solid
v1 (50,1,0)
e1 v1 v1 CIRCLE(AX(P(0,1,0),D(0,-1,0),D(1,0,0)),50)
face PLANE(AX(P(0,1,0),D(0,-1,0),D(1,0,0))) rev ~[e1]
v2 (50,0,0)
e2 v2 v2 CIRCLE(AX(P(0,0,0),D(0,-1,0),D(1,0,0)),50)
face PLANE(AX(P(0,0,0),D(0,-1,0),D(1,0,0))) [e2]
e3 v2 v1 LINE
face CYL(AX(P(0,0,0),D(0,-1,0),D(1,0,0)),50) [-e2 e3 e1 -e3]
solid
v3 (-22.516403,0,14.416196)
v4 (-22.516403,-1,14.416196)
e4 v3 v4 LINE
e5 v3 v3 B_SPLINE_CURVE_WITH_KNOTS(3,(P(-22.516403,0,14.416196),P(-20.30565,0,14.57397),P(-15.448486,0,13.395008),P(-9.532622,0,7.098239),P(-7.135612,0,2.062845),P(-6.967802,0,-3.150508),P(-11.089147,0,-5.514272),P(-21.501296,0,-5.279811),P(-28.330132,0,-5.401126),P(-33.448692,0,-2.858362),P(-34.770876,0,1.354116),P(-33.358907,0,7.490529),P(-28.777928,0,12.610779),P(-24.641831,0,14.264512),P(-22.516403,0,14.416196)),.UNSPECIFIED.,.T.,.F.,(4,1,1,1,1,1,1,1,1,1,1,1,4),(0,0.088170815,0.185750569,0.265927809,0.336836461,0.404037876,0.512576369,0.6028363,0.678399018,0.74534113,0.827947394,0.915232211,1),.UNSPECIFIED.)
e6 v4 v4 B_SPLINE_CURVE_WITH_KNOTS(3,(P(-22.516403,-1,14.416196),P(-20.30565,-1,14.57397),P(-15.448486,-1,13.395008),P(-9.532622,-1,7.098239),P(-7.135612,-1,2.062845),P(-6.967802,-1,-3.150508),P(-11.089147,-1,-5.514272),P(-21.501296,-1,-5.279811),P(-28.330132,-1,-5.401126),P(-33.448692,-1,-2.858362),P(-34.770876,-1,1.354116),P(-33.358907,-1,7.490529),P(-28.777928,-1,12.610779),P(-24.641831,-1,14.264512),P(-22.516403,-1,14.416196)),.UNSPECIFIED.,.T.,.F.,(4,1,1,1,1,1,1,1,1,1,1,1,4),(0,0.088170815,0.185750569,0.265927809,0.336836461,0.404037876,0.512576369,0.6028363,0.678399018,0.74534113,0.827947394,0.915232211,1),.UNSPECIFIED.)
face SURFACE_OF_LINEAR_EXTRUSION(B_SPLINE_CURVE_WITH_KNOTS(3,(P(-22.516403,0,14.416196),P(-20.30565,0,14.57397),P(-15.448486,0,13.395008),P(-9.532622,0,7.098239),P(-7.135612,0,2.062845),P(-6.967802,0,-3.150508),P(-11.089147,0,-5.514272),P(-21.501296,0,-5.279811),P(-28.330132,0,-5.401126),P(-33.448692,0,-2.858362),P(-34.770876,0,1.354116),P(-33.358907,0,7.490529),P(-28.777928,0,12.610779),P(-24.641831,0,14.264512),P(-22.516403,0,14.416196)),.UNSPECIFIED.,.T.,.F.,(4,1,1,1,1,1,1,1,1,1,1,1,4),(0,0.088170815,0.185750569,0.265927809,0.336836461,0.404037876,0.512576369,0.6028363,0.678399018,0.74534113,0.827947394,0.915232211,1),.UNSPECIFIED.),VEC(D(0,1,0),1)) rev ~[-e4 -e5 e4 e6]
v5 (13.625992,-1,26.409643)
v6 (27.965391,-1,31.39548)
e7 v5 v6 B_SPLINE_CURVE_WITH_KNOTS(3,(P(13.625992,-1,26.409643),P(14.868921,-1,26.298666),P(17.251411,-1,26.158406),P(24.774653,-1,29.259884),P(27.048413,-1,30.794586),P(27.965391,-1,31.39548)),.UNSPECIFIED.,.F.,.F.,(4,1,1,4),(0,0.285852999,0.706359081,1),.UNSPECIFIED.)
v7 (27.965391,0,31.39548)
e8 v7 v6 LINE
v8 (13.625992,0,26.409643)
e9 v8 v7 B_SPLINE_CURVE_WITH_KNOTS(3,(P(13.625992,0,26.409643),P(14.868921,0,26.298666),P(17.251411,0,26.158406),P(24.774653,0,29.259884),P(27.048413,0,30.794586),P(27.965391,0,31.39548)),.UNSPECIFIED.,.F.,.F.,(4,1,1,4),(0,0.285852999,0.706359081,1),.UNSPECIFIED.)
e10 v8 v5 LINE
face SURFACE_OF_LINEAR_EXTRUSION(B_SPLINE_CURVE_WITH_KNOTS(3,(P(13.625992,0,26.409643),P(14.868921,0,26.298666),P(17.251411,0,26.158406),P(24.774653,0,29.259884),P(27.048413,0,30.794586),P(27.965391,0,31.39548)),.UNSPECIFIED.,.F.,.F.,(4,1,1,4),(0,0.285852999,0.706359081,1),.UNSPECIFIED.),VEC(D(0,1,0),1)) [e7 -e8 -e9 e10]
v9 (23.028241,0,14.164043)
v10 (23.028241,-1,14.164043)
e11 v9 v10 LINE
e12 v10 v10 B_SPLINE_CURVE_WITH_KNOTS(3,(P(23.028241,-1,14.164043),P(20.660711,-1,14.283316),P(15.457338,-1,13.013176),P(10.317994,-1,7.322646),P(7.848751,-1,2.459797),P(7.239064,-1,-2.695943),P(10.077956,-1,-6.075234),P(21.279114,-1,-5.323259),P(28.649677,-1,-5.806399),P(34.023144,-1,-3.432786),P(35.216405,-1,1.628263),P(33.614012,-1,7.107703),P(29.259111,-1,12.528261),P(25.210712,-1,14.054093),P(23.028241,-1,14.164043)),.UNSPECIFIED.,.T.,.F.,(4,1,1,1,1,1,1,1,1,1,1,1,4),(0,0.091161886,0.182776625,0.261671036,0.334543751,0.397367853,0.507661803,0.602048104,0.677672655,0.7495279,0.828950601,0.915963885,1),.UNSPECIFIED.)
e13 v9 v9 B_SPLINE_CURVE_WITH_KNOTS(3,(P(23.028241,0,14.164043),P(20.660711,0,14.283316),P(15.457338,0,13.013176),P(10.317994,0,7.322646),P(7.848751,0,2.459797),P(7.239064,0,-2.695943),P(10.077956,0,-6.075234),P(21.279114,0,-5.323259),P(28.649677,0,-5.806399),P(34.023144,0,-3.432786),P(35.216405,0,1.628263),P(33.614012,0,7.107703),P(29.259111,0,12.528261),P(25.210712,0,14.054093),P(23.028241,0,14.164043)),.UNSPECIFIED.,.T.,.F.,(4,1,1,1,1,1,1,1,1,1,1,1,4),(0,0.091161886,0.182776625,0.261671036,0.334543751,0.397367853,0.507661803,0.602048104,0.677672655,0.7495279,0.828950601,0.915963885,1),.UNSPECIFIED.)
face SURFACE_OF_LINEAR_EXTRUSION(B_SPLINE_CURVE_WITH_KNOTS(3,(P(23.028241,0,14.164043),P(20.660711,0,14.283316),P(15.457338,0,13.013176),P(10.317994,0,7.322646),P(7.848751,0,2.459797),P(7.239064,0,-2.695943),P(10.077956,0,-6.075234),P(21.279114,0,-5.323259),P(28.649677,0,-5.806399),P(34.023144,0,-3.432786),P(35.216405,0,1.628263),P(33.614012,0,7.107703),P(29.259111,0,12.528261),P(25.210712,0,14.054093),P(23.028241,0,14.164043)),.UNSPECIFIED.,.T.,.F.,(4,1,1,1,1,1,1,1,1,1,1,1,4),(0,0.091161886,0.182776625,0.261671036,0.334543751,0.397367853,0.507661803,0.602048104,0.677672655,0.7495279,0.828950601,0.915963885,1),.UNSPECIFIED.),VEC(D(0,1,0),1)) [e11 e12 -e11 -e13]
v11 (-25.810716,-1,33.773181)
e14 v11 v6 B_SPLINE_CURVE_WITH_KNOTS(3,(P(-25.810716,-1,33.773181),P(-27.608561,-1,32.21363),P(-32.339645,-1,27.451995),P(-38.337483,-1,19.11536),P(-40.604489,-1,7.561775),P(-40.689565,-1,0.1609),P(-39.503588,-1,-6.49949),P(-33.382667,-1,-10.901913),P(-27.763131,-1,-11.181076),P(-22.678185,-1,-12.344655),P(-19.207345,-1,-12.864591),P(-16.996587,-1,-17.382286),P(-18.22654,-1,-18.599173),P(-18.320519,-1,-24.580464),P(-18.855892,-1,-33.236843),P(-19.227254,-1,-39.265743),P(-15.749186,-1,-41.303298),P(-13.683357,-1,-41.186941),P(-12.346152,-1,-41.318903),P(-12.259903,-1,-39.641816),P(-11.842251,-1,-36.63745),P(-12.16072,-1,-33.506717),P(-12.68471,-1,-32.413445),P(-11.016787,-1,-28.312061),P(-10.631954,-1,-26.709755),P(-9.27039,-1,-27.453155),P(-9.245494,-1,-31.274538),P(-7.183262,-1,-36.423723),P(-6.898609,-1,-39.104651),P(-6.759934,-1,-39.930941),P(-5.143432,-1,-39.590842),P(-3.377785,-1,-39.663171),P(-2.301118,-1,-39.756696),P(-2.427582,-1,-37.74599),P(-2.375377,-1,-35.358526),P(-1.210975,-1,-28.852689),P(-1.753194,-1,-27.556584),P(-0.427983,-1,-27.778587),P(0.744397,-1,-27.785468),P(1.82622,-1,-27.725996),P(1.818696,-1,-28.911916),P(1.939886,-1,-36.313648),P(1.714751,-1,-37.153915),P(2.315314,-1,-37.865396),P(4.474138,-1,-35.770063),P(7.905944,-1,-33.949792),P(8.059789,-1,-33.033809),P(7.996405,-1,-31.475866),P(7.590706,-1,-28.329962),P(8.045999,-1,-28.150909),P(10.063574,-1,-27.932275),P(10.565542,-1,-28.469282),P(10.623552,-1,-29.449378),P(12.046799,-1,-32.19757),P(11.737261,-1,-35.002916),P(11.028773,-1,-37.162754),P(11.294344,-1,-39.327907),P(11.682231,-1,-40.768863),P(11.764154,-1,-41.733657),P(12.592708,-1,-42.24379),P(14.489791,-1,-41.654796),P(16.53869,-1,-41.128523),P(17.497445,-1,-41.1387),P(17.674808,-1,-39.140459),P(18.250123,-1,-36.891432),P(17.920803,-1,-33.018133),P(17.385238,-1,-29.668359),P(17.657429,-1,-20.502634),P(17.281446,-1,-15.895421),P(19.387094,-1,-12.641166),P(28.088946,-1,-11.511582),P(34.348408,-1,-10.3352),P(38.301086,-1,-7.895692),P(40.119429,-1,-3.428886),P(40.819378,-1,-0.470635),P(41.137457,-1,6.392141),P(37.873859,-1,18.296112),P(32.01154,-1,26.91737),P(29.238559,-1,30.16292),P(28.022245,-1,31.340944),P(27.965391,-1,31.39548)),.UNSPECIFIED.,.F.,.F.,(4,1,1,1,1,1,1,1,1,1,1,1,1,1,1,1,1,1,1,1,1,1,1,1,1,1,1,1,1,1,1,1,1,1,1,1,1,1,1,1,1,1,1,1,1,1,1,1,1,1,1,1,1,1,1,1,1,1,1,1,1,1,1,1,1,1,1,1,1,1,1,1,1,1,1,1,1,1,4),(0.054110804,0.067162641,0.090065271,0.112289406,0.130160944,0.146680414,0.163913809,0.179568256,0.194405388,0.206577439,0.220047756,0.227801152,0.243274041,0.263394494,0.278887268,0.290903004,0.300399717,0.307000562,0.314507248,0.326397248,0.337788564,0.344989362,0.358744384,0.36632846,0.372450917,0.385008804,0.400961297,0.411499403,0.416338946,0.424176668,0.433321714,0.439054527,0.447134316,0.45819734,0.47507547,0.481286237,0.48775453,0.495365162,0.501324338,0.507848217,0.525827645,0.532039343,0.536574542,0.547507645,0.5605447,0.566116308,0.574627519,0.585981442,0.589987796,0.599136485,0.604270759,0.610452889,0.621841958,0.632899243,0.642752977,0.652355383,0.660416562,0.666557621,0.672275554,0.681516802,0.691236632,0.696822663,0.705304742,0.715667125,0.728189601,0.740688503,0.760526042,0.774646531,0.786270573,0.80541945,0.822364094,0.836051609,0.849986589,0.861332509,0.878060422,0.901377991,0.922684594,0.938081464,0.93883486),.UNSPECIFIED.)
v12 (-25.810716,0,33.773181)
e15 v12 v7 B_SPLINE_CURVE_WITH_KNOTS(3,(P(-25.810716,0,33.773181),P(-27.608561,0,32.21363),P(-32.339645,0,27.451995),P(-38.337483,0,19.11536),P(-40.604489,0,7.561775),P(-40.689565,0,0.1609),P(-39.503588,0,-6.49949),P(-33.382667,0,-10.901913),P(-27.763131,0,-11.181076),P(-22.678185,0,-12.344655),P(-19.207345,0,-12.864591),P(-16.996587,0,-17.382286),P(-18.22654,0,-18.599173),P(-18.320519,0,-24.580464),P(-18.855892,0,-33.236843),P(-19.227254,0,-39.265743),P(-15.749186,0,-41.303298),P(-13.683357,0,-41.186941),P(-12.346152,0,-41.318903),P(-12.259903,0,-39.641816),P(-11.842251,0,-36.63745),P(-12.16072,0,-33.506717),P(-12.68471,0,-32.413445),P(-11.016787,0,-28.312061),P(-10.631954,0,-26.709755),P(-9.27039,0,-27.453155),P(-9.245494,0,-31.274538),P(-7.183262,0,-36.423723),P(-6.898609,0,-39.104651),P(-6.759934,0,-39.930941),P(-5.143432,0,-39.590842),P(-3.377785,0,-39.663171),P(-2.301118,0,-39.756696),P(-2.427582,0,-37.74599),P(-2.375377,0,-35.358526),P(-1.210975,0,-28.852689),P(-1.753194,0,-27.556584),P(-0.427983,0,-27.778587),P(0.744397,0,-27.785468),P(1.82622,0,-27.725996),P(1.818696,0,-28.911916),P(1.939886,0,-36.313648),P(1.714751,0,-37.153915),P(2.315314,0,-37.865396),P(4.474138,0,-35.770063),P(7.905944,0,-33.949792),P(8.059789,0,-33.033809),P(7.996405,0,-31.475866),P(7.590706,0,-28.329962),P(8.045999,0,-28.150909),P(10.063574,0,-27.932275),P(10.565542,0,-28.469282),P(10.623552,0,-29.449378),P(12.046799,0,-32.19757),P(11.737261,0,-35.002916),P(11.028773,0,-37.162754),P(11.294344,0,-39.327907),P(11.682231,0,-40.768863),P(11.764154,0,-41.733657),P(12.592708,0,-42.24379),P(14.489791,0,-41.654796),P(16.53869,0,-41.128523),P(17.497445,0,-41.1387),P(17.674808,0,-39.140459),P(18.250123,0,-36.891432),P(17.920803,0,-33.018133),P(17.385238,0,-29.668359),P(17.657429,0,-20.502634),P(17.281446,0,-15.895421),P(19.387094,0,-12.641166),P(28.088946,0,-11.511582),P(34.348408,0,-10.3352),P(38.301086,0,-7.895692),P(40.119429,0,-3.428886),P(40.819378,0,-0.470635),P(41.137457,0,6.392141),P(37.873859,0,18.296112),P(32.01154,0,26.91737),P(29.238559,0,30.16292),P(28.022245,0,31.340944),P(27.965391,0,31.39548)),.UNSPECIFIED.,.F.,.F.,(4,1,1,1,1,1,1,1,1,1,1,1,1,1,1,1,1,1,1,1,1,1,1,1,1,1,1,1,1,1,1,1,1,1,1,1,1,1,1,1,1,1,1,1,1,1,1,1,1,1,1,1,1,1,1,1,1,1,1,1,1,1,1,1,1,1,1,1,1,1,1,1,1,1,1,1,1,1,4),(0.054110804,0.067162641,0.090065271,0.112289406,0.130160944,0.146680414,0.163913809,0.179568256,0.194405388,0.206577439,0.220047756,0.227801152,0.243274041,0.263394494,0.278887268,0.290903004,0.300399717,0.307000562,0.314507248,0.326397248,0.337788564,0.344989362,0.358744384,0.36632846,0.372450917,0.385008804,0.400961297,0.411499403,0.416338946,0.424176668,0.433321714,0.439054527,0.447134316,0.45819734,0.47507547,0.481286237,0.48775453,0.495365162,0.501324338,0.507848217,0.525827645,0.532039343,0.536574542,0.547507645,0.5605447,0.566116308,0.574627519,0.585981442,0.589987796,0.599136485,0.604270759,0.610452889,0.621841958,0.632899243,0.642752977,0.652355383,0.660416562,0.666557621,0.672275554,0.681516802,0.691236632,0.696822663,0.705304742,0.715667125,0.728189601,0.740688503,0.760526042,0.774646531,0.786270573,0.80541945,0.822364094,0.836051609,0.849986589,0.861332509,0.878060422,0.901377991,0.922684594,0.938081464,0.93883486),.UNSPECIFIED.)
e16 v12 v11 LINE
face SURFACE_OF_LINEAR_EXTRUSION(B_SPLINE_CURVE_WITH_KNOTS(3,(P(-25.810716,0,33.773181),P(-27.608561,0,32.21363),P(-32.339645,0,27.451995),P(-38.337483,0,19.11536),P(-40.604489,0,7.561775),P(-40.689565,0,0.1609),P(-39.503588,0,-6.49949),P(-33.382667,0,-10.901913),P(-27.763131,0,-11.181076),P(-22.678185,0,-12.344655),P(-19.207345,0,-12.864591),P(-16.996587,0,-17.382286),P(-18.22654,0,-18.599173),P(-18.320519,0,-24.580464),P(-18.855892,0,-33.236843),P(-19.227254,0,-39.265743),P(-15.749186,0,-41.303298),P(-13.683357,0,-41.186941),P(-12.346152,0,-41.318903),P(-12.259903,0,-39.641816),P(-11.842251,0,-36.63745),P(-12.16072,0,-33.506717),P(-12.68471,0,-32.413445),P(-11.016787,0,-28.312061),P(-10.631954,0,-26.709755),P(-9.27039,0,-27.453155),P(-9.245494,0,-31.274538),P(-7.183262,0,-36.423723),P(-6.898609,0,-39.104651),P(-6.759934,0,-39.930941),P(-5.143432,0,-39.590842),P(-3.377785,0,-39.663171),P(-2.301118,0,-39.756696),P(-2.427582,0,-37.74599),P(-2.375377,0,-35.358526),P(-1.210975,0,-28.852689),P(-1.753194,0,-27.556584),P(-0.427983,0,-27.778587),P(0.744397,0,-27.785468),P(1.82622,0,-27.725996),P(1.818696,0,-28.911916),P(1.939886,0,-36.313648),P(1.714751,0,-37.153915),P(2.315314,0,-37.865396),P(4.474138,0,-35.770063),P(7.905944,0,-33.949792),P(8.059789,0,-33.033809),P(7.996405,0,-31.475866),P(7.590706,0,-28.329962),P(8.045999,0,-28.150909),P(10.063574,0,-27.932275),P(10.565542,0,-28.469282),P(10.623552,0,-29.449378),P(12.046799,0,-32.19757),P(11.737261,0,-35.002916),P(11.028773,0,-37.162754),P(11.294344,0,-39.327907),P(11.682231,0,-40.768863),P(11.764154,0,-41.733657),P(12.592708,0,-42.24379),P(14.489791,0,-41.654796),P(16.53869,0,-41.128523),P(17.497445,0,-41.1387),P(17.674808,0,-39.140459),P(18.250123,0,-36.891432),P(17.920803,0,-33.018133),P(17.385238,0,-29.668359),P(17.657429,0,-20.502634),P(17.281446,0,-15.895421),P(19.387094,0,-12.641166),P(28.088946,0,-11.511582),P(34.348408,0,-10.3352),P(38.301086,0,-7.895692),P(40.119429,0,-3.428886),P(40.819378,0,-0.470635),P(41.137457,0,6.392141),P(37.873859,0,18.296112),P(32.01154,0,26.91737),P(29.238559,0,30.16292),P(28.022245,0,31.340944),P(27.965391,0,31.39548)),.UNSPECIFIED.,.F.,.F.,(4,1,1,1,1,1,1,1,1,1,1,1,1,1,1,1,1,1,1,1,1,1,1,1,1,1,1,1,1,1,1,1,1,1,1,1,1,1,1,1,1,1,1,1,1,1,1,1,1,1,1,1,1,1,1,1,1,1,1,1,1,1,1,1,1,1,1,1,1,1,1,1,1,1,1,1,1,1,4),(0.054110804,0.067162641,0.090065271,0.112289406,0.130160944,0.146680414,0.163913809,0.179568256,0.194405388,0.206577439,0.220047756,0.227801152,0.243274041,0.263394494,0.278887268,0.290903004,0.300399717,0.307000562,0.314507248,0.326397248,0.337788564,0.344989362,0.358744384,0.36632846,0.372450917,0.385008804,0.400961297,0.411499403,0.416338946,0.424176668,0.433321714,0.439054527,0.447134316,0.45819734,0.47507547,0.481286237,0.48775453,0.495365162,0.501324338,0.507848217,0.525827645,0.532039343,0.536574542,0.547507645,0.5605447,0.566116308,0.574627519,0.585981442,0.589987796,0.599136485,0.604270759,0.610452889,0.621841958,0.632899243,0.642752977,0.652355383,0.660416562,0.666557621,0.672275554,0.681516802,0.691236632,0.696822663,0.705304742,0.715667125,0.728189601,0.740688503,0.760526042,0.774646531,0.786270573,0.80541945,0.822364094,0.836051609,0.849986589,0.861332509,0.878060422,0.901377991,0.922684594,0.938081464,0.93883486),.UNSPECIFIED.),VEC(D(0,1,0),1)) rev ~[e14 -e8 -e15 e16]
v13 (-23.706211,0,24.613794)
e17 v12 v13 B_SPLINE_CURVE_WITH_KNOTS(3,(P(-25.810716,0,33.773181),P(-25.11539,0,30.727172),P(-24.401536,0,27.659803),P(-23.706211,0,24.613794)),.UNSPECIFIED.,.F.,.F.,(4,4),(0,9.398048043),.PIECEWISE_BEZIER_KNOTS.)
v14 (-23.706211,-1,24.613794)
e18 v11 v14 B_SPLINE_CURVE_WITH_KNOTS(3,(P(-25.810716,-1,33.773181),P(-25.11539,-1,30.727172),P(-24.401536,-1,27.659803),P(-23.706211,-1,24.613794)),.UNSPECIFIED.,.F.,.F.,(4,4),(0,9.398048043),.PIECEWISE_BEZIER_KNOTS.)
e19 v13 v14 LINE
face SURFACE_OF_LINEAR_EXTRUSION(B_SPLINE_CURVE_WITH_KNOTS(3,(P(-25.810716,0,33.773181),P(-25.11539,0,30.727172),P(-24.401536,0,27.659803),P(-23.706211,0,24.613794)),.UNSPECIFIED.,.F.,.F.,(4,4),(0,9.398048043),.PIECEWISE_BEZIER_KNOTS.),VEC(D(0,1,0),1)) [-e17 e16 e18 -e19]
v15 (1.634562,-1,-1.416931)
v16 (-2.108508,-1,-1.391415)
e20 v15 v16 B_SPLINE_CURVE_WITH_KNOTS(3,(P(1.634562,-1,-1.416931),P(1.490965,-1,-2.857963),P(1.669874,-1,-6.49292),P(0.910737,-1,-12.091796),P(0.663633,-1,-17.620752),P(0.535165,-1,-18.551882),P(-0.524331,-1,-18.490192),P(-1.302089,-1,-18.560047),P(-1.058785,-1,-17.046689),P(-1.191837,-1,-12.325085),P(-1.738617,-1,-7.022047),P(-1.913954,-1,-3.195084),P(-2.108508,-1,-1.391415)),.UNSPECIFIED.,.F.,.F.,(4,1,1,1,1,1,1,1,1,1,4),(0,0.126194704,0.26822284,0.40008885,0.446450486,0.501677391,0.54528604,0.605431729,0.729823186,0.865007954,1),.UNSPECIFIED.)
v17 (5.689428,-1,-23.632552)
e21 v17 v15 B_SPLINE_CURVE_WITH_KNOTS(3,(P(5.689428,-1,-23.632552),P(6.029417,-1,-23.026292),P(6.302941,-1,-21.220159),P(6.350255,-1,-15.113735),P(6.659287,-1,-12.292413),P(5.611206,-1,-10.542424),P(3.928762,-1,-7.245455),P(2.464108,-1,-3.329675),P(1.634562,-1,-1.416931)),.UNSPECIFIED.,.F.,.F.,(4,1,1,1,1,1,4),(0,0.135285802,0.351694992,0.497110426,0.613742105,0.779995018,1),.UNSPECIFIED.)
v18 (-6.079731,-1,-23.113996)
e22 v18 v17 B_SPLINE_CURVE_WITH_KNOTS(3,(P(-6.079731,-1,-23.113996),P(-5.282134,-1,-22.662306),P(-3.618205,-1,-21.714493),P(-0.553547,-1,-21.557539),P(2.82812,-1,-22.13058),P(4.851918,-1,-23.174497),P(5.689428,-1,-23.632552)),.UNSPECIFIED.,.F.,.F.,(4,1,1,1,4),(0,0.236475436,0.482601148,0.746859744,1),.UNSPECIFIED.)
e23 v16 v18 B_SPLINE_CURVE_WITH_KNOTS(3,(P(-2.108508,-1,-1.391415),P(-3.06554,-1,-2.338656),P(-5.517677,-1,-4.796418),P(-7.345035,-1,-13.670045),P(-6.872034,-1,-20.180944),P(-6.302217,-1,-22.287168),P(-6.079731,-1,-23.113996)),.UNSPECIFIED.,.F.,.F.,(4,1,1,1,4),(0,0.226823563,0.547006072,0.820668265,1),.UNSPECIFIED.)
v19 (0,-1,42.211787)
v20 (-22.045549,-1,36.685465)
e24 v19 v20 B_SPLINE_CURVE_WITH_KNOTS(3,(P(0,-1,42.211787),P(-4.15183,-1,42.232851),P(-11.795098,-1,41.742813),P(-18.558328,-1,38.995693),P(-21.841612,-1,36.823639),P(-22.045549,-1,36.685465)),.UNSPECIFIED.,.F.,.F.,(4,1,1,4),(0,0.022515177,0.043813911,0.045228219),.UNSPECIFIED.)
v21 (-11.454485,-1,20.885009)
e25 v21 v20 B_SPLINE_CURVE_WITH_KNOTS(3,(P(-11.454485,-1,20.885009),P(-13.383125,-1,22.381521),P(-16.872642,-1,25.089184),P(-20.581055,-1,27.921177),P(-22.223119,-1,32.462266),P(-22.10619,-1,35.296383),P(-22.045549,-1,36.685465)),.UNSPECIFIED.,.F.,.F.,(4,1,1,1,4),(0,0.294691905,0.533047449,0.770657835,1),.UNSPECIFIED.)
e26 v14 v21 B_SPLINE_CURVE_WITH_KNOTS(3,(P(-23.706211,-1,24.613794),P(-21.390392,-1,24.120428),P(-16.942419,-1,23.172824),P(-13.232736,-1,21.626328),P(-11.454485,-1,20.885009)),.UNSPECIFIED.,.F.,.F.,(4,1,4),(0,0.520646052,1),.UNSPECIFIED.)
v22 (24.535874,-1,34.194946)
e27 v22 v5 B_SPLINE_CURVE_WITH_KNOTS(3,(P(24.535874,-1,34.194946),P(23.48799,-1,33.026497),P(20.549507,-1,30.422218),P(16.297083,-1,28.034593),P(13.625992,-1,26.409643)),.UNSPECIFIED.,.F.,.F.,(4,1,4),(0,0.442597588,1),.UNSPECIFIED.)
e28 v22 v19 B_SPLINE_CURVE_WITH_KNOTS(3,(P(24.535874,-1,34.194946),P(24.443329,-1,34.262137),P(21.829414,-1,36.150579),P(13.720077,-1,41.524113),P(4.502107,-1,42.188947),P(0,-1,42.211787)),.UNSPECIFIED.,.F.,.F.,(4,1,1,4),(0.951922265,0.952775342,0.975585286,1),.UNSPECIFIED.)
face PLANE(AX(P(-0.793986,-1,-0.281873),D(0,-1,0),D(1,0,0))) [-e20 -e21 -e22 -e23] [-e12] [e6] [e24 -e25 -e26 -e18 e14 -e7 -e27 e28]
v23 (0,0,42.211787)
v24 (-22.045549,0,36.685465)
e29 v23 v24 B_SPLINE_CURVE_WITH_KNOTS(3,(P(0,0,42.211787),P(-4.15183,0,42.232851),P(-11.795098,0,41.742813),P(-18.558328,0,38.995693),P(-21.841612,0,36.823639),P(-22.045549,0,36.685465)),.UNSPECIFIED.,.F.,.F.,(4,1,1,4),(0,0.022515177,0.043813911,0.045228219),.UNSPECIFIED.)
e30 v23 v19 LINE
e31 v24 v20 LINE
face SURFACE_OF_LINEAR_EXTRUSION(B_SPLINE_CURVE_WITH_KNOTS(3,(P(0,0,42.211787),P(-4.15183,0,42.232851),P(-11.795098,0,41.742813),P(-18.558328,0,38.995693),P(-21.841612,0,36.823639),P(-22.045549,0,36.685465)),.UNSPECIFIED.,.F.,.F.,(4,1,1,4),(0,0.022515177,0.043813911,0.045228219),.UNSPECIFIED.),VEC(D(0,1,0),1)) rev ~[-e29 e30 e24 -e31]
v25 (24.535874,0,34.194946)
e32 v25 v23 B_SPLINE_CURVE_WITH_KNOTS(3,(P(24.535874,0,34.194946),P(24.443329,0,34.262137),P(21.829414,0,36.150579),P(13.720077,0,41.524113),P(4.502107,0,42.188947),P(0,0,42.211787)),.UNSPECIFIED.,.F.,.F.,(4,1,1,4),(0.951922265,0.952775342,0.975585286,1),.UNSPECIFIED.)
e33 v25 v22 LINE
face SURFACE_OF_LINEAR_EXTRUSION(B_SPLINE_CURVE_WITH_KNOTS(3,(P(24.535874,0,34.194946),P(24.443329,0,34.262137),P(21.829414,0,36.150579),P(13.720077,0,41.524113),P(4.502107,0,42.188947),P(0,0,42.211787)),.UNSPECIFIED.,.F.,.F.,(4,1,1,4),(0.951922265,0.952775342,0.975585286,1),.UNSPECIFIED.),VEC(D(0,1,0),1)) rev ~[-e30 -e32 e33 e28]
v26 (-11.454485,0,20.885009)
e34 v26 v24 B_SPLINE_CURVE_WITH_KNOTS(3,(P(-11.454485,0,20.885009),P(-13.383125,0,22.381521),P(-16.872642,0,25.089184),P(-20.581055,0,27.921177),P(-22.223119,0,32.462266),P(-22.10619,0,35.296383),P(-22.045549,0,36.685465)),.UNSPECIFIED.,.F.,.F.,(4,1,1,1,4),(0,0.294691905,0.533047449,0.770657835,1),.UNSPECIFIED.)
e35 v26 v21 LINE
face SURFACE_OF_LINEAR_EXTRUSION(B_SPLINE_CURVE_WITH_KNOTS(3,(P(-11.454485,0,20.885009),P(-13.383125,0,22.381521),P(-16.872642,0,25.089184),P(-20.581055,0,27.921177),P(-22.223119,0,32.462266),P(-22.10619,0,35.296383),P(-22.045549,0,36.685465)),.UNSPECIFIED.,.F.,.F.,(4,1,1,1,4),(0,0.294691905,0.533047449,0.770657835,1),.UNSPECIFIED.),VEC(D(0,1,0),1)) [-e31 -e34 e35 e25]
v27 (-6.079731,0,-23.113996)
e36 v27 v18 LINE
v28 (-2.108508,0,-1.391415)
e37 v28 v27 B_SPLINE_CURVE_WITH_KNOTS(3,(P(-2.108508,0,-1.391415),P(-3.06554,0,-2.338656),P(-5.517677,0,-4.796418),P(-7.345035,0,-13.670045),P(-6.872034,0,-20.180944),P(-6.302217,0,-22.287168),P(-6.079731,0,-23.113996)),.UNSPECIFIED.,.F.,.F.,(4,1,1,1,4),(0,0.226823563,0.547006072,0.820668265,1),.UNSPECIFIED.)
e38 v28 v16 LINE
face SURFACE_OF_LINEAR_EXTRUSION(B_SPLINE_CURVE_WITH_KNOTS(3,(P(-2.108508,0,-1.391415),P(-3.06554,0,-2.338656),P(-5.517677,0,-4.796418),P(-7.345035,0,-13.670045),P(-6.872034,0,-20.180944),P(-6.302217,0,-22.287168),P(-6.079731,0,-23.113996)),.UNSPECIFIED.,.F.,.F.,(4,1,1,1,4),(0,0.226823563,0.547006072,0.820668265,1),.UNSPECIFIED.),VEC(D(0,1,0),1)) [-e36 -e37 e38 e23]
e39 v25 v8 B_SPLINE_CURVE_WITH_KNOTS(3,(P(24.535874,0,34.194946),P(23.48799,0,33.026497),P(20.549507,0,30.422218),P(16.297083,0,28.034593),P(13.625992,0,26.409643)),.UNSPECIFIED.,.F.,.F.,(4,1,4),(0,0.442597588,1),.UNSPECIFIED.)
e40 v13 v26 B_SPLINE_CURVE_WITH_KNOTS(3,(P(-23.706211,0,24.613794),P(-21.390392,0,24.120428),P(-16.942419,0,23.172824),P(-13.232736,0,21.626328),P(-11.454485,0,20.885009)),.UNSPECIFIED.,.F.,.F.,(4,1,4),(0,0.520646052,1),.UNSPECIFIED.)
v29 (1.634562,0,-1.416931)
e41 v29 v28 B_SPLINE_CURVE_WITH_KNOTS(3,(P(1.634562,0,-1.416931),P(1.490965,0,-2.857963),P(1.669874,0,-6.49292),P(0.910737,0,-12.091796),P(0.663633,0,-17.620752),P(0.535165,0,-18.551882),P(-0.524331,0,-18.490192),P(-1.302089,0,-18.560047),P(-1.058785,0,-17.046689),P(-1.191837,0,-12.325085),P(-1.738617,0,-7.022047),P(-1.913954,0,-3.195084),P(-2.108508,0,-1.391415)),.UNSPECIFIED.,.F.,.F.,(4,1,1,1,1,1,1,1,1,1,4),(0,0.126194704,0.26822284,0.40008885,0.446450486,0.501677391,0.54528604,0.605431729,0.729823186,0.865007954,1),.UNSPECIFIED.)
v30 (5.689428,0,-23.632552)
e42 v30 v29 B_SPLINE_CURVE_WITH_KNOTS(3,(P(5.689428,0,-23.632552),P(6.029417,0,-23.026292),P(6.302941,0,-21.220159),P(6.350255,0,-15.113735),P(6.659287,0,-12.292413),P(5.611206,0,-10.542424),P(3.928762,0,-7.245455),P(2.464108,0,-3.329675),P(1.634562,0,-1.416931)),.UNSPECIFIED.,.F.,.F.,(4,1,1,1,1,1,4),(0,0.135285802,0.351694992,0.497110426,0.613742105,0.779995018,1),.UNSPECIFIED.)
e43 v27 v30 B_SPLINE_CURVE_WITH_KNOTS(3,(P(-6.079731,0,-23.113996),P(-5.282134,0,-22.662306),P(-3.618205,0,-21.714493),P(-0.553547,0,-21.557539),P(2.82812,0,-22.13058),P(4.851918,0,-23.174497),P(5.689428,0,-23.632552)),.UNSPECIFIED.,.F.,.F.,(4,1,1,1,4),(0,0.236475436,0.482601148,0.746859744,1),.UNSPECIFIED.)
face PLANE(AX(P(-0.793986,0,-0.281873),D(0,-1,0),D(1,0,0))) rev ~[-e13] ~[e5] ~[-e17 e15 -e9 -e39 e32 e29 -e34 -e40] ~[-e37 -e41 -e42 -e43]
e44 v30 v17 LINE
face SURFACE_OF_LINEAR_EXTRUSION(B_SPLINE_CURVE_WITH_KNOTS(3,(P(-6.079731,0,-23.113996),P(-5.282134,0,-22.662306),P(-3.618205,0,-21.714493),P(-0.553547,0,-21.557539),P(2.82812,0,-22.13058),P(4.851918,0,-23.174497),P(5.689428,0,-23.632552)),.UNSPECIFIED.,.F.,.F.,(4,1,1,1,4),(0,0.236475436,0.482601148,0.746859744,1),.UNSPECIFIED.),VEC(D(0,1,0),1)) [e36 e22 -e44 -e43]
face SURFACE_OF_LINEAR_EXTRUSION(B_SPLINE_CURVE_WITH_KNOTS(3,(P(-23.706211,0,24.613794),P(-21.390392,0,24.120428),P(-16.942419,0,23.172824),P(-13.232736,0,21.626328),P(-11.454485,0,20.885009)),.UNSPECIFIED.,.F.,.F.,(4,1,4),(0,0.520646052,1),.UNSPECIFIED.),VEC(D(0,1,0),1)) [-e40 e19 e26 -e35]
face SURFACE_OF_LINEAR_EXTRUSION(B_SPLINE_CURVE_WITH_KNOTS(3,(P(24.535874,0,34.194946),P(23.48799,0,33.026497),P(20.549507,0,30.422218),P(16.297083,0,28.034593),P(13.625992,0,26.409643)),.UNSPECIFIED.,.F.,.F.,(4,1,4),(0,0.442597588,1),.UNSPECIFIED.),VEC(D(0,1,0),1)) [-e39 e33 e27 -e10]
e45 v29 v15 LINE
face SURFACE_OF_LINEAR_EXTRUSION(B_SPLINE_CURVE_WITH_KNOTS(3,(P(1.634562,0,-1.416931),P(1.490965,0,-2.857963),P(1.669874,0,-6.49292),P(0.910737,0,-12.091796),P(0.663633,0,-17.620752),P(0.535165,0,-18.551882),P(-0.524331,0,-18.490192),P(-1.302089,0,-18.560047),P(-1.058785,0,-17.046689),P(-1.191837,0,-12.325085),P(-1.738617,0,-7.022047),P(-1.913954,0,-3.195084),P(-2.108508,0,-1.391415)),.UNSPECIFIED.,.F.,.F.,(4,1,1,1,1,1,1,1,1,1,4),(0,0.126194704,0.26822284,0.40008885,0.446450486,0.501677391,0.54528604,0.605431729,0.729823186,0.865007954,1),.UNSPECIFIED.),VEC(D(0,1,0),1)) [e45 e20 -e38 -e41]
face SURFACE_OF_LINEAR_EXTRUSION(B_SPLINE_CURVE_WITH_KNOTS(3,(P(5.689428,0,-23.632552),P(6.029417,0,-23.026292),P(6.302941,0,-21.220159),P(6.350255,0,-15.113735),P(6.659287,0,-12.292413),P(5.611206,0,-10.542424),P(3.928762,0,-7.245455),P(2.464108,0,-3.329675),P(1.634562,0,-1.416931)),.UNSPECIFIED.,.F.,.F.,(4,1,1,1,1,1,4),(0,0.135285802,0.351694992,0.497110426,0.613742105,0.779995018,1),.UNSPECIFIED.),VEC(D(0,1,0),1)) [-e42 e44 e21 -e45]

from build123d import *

# Parameters (mm, degrees)
F1_R     = 50
F2_DEPTH = 1
F3_DEPTH = 1


with BuildPart() as f2:
    # F1 (on Front) → F2 (new body)
    with BuildSketch(Plane.XZ):
        Circle(F1_R)
        with BuildLine():
            add(Edge.make_bspline(
                [(0, 42.2117872393), (-4.1518296289, 42.2328506159), (-11.7950982354, 41.7428127116), (-18.5583280025, 38.9956928302), (-21.8416117864, 36.8236386827), (-22.0455490568, 36.6854647788)],
                knots=[0, 0, 0, 0, 0.0225151774, 0.0438139107, 0.045228219, 0.045228219, 0.045228219, 0.045228219], degree=3))
            add(Edge.make_bspline(
                [(24.5358739047, 34.1949462892), (24.4433290355, 34.2621365821), (21.8294135785, 36.1505788176), (13.7200767318, 41.5241134747), (4.5021068795, 42.1889468096), (0, 42.2117872393)],
                knots=[0.9519222652, 0.9519222652, 0.9519222652, 0.9519222652, 0.9527753421, 0.9755852855, 1, 1, 1, 1], degree=3))
            add(Edge.make_bspline(
                [(27.9653905239, 31.395479857), (26.9777623389, 32.3428383748), (25.9556430174, 33.1641522159), (24.5358739047, 34.1949462892)],
                knots=[0.9388348597, 0.9388348597, 0.9388348597, 0.9388348597, 0.9519222652, 0.9519222652, 0.9519222652, 0.9519222652], degree=3))
            add(Edge.make_bspline(
                [(-25.8107159623, 33.7731806512), (-27.6085613015, 32.2136299029), (-32.3396448263, 27.4519948446), (-38.3374828793, 19.1153604845), (-40.6044889327, 7.5617746628), (-40.6895649134, 0.160899739), (-39.5035880323, -6.4994897033), (-33.3826669028, -10.9019134709), (-27.7631312299, -11.1810756086), (-22.678184549, -12.3446551948), (-19.2073445078, -12.8645914377), (-16.996587281, -17.3822862253), (-18.2265403297, -18.5991733267), (-18.3205187094, -24.5804643067), (-18.8558923982, -33.23684272), (-19.227253605, -39.2657426144), (-15.7491862761, -41.3032984762), (-13.6833573427, -41.1869410633), (-12.3461522337, -41.3189025592), (-12.259903056, -39.641815711), (-11.8422509257, -36.6374496799), (-12.1607198609, -33.5067173398), (-12.6847097019, -32.4134451461), (-11.0167872005, -28.3120606994), (-10.6319540152, -26.7097549158), (-9.2703902883, -27.4531554981), (-9.2454941531, -31.2745381629), (-7.1832623162, -36.42372276), (-6.8986091815, -39.104650667), (-6.7599340161, -39.930941303), (-5.1434315839, -39.5908424392), (-3.3777848263, -39.6631714956), (-2.3011178725, -39.7566957771), (-2.4275819303, -37.7459902706), (-2.3753767127, -35.3585257917), (-1.2109750063, -28.8526891406), (-1.7531941117, -27.5565836186), (-0.4279829764, -27.7785865503), (0.7443967174, -27.7854675929), (1.8262199292, -27.7259962358), (1.8186960843, -28.9119160062), (1.939885801, -36.3136478787), (1.7147514894, -37.153915214), (2.3153140554, -37.8653960955), (4.474137977, -35.7700630422), (7.9059440218, -33.949791946), (8.0597885263, -33.0338090974), (7.9964054591, -31.47586601), (7.5907060715, -28.3299618284), (8.0459994485, -28.1509086857), (10.0635743869, -27.9322750531), (10.5655419684, -28.4692820234), (10.6235516671, -29.4493784445), (12.046798778, -32.1975702095), (11.7372607804, -35.0029162994), (11.0287730808, -37.1627540966), (11.2943438203, -39.3279067847), (11.6822310138, -40.7688631927), (11.7641542089, -41.7336571667), (12.5927081487, -42.2437898456), (14.4897914582, -41.6547960008), (16.5386899479, -41.12852309), (17.497445307, -41.1386999382), (17.6748084447, -39.1404593024), (18.2501228287, -36.8914322934), (17.9208027823, -33.0181329788), (17.3852379788, -29.6683592104), (17.6574289505, -20.5026342529), (17.2814460979, -15.895420763), (19.3870938668, -12.641166496), (28.0889463204, -11.5115820335), (34.3484075669, -10.3351999916), (38.301085908, -7.8956922039), (40.1194286606, -3.4288857106), (40.8193777367, -0.4706351688), (41.1374570255, 6.3921409484), (37.8738587815, 18.2961121975), (32.0115398849, 26.9173704674), (29.2385585182, 30.1629197914), (28.0222448075, 31.3409437566), (27.9653905239, 31.395479857)],
                knots=[0.0541108044, 0.0541108044, 0.0541108044, 0.0541108044, 0.0671626411, 0.0900652708, 0.1122894062, 0.1301609437, 0.146680414, 0.1639138092, 0.1795682556, 0.194405388, 0.2065774387, 0.2200477559, 0.2278011522, 0.2432740409, 0.2633944941, 0.2788872676, 0.2909030042, 0.3003997174, 0.3070005619, 0.314507248, 0.3263972484, 0.3377885639, 0.3449893617, 0.3587443837, 0.3663284603, 0.3724509167, 0.3850088038, 0.4009612972, 0.4114994031, 0.4163389463, 0.4241766679, 0.4333217141, 0.439054527, 0.4471343161, 0.4581973396, 0.47507547, 0.4812862368, 0.4877545299, 0.4953651617, 0.5013243377, 0.5078482173, 0.5258276452, 0.5320393427, 0.5365745419, 0.5475076454, 0.5605446996, 0.5661163082, 0.5746275185, 0.5859814425, 0.5899877962, 0.5991364847, 0.6042707585, 0.6104528895, 0.6218419575, 0.6328992427, 0.6427529769, 0.6523553828, 0.6604165619, 0.666557621, 0.6722755539, 0.6815168022, 0.6912366323, 0.6968226628, 0.7053047419, 0.7156671247, 0.7281896012, 0.7406885031, 0.7605260422, 0.7746465306, 0.7862705734, 0.8054194498, 0.8223640938, 0.8360516094, 0.8499865894, 0.8613325091, 0.8780604221, 0.9013779912, 0.922684594, 0.9380814638, 0.9388348597, 0.9388348597, 0.9388348597, 0.9388348597], degree=3))
            add(Edge.make_bspline(
                [(-22.0455490568, 36.6854647788), (-23.3263802505, 35.8176614299), (-24.5871705589, 34.8345517868), (-25.8107159623, 33.7731806512)],
                knots=[0.045228219, 0.045228219, 0.045228219, 0.045228219, 0.0541108044, 0.0541108044, 0.0541108044, 0.0541108044], degree=3))
        make_face(mode=Mode.SUBTRACT)
        with BuildLine():
            add(Edge.make_bspline(
                [(24.5358739047, 34.1949462892), (24.4433290355, 34.2621365821), (21.8294135785, 36.1505788176), (13.7200767318, 41.5241134747), (4.5021068795, 42.1889468096), (0, 42.2117872393)],
                knots=[0.9519222652, 0.9519222652, 0.9519222652, 0.9519222652, 0.9527753421, 0.9755852855, 1, 1, 1, 1], degree=3))
            add(Edge.make_bspline(
                [(0, 42.2117872393), (-4.1518296289, 42.2328506159), (-11.7950982354, 41.7428127116), (-18.5583280025, 38.9956928302), (-21.8416117864, 36.8236386827), (-22.0455490568, 36.6854647788)],
                knots=[0, 0, 0, 0, 0.0225151774, 0.0438139107, 0.045228219, 0.045228219, 0.045228219, 0.045228219], degree=3))
            add(Edge.make_bspline(
                [(-11.4544853568, 20.8850093186), (-13.3831250096, 22.3815208443), (-16.8726422179, 25.0891840482), (-20.5810547116, 27.9211767393), (-22.2231186928, 32.4622663142), (-22.1061900395, 35.2963825837), (-22.0455490568, 36.6854647788)],
                knots=[0, 0, 0, 0, 0.294691905, 0.5330474492, 0.7706578355, 1, 1, 1, 1], degree=3))
            add(Edge.make_bspline(
                [(-23.7062107772, 24.6137939394), (-21.3903915949, 24.1204278596), (-16.9424193646, 23.1728242477), (-13.2327364884, 21.6263282704), (-11.4544853568, 20.8850093186)],
                knots=[0, 0, 0, 0, 0.5206460523, 1, 1, 1, 1], degree=3))
            add(Edge.make_bspline(
                [(-25.8107159623, 33.7731806512), (-25.1153904588, 30.7271716499), (-24.4015362806, 27.6598029406), (-23.7062107772, 24.6137939394)],
                knots=[0, 0, 0, 0, 9.3980480426, 9.3980480426, 9.3980480426, 9.3980480426], degree=3))
            add(Edge.make_bspline(
                [(-25.8107159623, 33.7731806512), (-27.6085613015, 32.2136299029), (-32.3396448263, 27.4519948446), (-38.3374828793, 19.1153604845), (-40.6044889327, 7.5617746628), (-40.6895649134, 0.160899739), (-39.5035880323, -6.4994897033), (-33.3826669028, -10.9019134709), (-27.7631312299, -11.1810756086), (-22.678184549, -12.3446551948), (-19.2073445078, -12.8645914377), (-16.996587281, -17.3822862253), (-18.2265403297, -18.5991733267), (-18.3205187094, -24.5804643067), (-18.8558923982, -33.23684272), (-19.227253605, -39.2657426144), (-15.7491862761, -41.3032984762), (-13.6833573427, -41.1869410633), (-12.3461522337, -41.3189025592), (-12.259903056, -39.641815711), (-11.8422509257, -36.6374496799), (-12.1607198609, -33.5067173398), (-12.6847097019, -32.4134451461), (-11.0167872005, -28.3120606994), (-10.6319540152, -26.7097549158), (-9.2703902883, -27.4531554981), (-9.2454941531, -31.2745381629), (-7.1832623162, -36.42372276), (-6.8986091815, -39.104650667), (-6.7599340161, -39.930941303), (-5.1434315839, -39.5908424392), (-3.3777848263, -39.6631714956), (-2.3011178725, -39.7566957771), (-2.4275819303, -37.7459902706), (-2.3753767127, -35.3585257917), (-1.2109750063, -28.8526891406), (-1.7531941117, -27.5565836186), (-0.4279829764, -27.7785865503), (0.7443967174, -27.7854675929), (1.8262199292, -27.7259962358), (1.8186960843, -28.9119160062), (1.939885801, -36.3136478787), (1.7147514894, -37.153915214), (2.3153140554, -37.8653960955), (4.474137977, -35.7700630422), (7.9059440218, -33.949791946), (8.0597885263, -33.0338090974), (7.9964054591, -31.47586601), (7.5907060715, -28.3299618284), (8.0459994485, -28.1509086857), (10.0635743869, -27.9322750531), (10.5655419684, -28.4692820234), (10.6235516671, -29.4493784445), (12.046798778, -32.1975702095), (11.7372607804, -35.0029162994), (11.0287730808, -37.1627540966), (11.2943438203, -39.3279067847), (11.6822310138, -40.7688631927), (11.7641542089, -41.7336571667), (12.5927081487, -42.2437898456), (14.4897914582, -41.6547960008), (16.5386899479, -41.12852309), (17.497445307, -41.1386999382), (17.6748084447, -39.1404593024), (18.2501228287, -36.8914322934), (17.9208027823, -33.0181329788), (17.3852379788, -29.6683592104), (17.6574289505, -20.5026342529), (17.2814460979, -15.895420763), (19.3870938668, -12.641166496), (28.0889463204, -11.5115820335), (34.3484075669, -10.3351999916), (38.301085908, -7.8956922039), (40.1194286606, -3.4288857106), (40.8193777367, -0.4706351688), (41.1374570255, 6.3921409484), (37.8738587815, 18.2961121975), (32.0115398849, 26.9173704674), (29.2385585182, 30.1629197914), (28.0222448075, 31.3409437566), (27.9653905239, 31.395479857)],
                knots=[0.0541108044, 0.0541108044, 0.0541108044, 0.0541108044, 0.0671626411, 0.0900652708, 0.1122894062, 0.1301609437, 0.146680414, 0.1639138092, 0.1795682556, 0.194405388, 0.2065774387, 0.2200477559, 0.2278011522, 0.2432740409, 0.2633944941, 0.2788872676, 0.2909030042, 0.3003997174, 0.3070005619, 0.314507248, 0.3263972484, 0.3377885639, 0.3449893617, 0.3587443837, 0.3663284603, 0.3724509167, 0.3850088038, 0.4009612972, 0.4114994031, 0.4163389463, 0.4241766679, 0.4333217141, 0.439054527, 0.4471343161, 0.4581973396, 0.47507547, 0.4812862368, 0.4877545299, 0.4953651617, 0.5013243377, 0.5078482173, 0.5258276452, 0.5320393427, 0.5365745419, 0.5475076454, 0.5605446996, 0.5661163082, 0.5746275185, 0.5859814425, 0.5899877962, 0.5991364847, 0.6042707585, 0.6104528895, 0.6218419575, 0.6328992427, 0.6427529769, 0.6523553828, 0.6604165619, 0.666557621, 0.6722755539, 0.6815168022, 0.6912366323, 0.6968226628, 0.7053047419, 0.7156671247, 0.7281896012, 0.7406885031, 0.7605260422, 0.7746465306, 0.7862705734, 0.8054194498, 0.8223640938, 0.8360516094, 0.8499865894, 0.8613325091, 0.8780604221, 0.9013779912, 0.922684594, 0.9380814638, 0.9388348597, 0.9388348597, 0.9388348597, 0.9388348597], degree=3))
            add(Edge.make_bspline(
                [(13.6259915307, 26.4096427709), (14.868920669, 26.2986663729), (17.2514108839, 26.1584062189), (24.774652777, 29.2598838581), (27.0484131927, 30.7945864143), (27.9653905239, 31.395479857)],
                knots=[0, 0, 0, 0, 0.2858529991, 0.7063590813, 1, 1, 1, 1], degree=3))
            add(Edge.make_bspline(
                [(24.5358739047, 34.1949462892), (23.4879896951, 33.0264970783), (20.5495068901, 30.4222182975), (16.2970825885, 28.0345928893), (13.6259915307, 26.4096427709)],
                knots=[0, 0, 0, 0, 0.442597588, 1, 1, 1, 1], degree=3))
        make_face()
        with BuildLine():
            add(Edge.make_bspline(
                [(-2.1085075568, -1.3914147858), (-3.0655404836, -2.3386562763), (-5.5176771557, -4.7964180048), (-7.3450347709, -13.6700454772), (-6.8720338251, -20.1809438225), (-6.3022172592, -22.2871682189), (-6.0797305778, -23.1139957905)],
                knots=[0, 0, 0, 0, 0.2268235626, 0.5470060722, 0.8206682651, 1, 1, 1, 1], degree=3))
            add(Edge.make_bspline(
                [(1.6345615732, -1.4169309288), (1.490965324, -2.8579625684), (1.6698736726, -6.4929197922), (0.9107367519, -12.0917960968), (0.6636329535, -17.6207516228), (0.5351646096, -18.5518819855), (-0.5243314009, -18.4901924912), (-1.3020890252, -18.5600471583), (-1.0587853603, -17.0466885783), (-1.1918373245, -12.325085245), (-1.738616593, -7.0220474396), (-1.9139538894, -3.1950838865), (-2.1085075568, -1.3914147858)],
                knots=[0, 0, 0, 0, 0.1261947039, 0.26822284, 0.4000888499, 0.4464504861, 0.5016773906, 0.5452860405, 0.6054317293, 0.7298231859, 0.865007954, 1, 1, 1, 1], degree=3))
            add(Edge.make_bspline(
                [(5.6894281879, -23.6325524747), (6.0294169274, -23.0262918846), (6.3029405429, -21.2201590976), (6.3502553341, -15.1137353852), (6.6592869733, -12.2924128873), (5.6112064851, -10.5424236095), (3.928762237, -7.2454551493), (2.4641075989, -3.3296749739), (1.6345615732, -1.4169309288)],
                knots=[0, 0, 0, 0, 0.135285802, 0.3516949921, 0.4971104265, 0.6137421047, 0.7799950182, 1, 1, 1, 1], degree=3))
            add(Edge.make_bspline(
                [(-6.0797305778, -23.1139957905), (-5.2821336221, -22.6623060144), (-3.6182047793, -21.7144926982), (-0.5535468195, -21.5575389799), (2.8281198488, -22.13058005), (4.8519182444, -23.1744974538), (5.6894281879, -23.6325524747)],
                knots=[0, 0, 0, 0, 0.2364754365, 0.4826011482, 0.746859744, 1, 1, 1, 1], degree=3))
        make_face(mode=Mode.SUBTRACT)
        with BuildLine():
            add(Edge.make_bspline(
                [(-22.5164033473, 14.4161963835), (-20.3056495064, 14.5739696965), (-15.4484858005, 13.3950084417), (-9.5326219645, 7.0982389572), (-7.1356121774, 2.062845141), (-6.9678023394, -3.1505079616), (-11.089146518, -5.5142723572), (-21.5012962295, -5.2798109014), (-28.3301322656, -5.4011257214), (-33.4486923273, -2.8583619411), (-34.7708764838, 1.3541160099), (-33.3589073398, 7.4905291071), (-28.777927567, 12.6107787217), (-24.6418312895, 14.2645124639), (-22.5164033473, 14.4161963835)],
                knots=[0, 0, 0, 0, 0.0881708155, 0.1857505695, 0.2659278088, 0.3368364609, 0.4040378762, 0.5125763687, 0.6028363001, 0.6783990179, 0.7453411296, 0.8279473944, 0.9152322111, 1, 1, 1, 1], degree=3))
        make_face(mode=Mode.SUBTRACT)
        with BuildLine():
            add(Edge.make_bspline(
                [(23.0282414705, 14.1640426591), (20.6607105304, 14.283315886), (15.4573377902, 13.0131761992), (10.31799426, 7.3226457935), (7.8487509767, 2.4597974628), (7.2390637852, -2.6959434398), (10.0779558768, -6.0752341115), (21.2791142164, -5.323258849), (28.6496767132, -5.8063992171), (34.0231438718, -3.4327860627), (35.2164049867, 1.6282631307), (33.614011723, 7.1077034989), (29.2591111394, 12.5282611205), (25.2107117158, 14.054092557), (23.0282414705, 14.1640426591)],
                knots=[0, 0, 0, 0, 0.0911618856, 0.1827766253, 0.2616710357, 0.3345437506, 0.3973678532, 0.5076618027, 0.6020481042, 0.6776726552, 0.7495279, 0.8289506007, 0.9159638848, 1, 1, 1, 1], degree=3))
        make_face(mode=Mode.SUBTRACT)
        with BuildLine():
            add(Edge.make_bspline(
                [(23.0282414705, 14.1640426591), (20.6607105304, 14.283315886), (15.4573377902, 13.0131761992), (10.31799426, 7.3226457935), (7.8487509767, 2.4597974628), (7.2390637852, -2.6959434398), (10.0779558768, -6.0752341115), (21.2791142164, -5.323258849), (28.6496767132, -5.8063992171), (34.0231438718, -3.4327860627), (35.2164049867, 1.6282631307), (33.614011723, 7.1077034989), (29.2591111394, 12.5282611205), (25.2107117158, 14.054092557), (23.0282414705, 14.1640426591)],
                knots=[0, 0, 0, 0, 0.0911618856, 0.1827766253, 0.2616710357, 0.3345437506, 0.3973678532, 0.5076618027, 0.6020481042, 0.6776726552, 0.7495279, 0.8289506007, 0.9159638848, 1, 1, 1, 1], degree=3))
        make_face()
        with BuildLine():
            add(Edge.make_bspline(
                [(-22.5164033473, 14.4161963835), (-20.3056495064, 14.5739696965), (-15.4484858005, 13.3950084417), (-9.5326219645, 7.0982389572), (-7.1356121774, 2.062845141), (-6.9678023394, -3.1505079616), (-11.089146518, -5.5142723572), (-21.5012962295, -5.2798109014), (-28.3301322656, -5.4011257214), (-33.4486923273, -2.8583619411), (-34.7708764838, 1.3541160099), (-33.3589073398, 7.4905291071), (-28.777927567, 12.6107787217), (-24.6418312895, 14.2645124639), (-22.5164033473, 14.4161963835)],
                knots=[0, 0, 0, 0, 0.0881708155, 0.1857505695, 0.2659278088, 0.3368364609, 0.4040378762, 0.5125763687, 0.6028363001, 0.6783990179, 0.7453411296, 0.8279473944, 0.9152322111, 1, 1, 1, 1], degree=3))
        make_face()
        with BuildLine():
            add(Edge.make_bspline(
                [(1.6345615732, -1.4169309288), (1.490965324, -2.8579625684), (1.6698736726, -6.4929197922), (0.9107367519, -12.0917960968), (0.6636329535, -17.6207516228), (0.5351646096, -18.5518819855), (-0.5243314009, -18.4901924912), (-1.3020890252, -18.5600471583), (-1.0587853603, -17.0466885783), (-1.1918373245, -12.325085245), (-1.738616593, -7.0220474396), (-1.9139538894, -3.1950838865), (-2.1085075568, -1.3914147858)],
                knots=[0, 0, 0, 0, 0.1261947039, 0.26822284, 0.4000888499, 0.4464504861, 0.5016773906, 0.5452860405, 0.6054317293, 0.7298231859, 0.865007954, 1, 1, 1, 1], degree=3))
            add(Edge.make_bspline(
                [(-2.1085075568, -1.3914147858), (-3.0655404836, -2.3386562763), (-5.5176771557, -4.7964180048), (-7.3450347709, -13.6700454772), (-6.8720338251, -20.1809438225), (-6.3022172592, -22.2871682189), (-6.0797305778, -23.1139957905)],
                knots=[0, 0, 0, 0, 0.2268235626, 0.5470060722, 0.8206682651, 1, 1, 1, 1], degree=3))
            add(Edge.make_bspline(
                [(-6.0797305778, -23.1139957905), (-5.2821336221, -22.6623060144), (-3.6182047793, -21.7144926982), (-0.5535468195, -21.5575389799), (2.8281198488, -22.13058005), (4.8519182444, -23.1744974538), (5.6894281879, -23.6325524747)],
                knots=[0, 0, 0, 0, 0.2364754365, 0.4826011482, 0.746859744, 1, 1, 1, 1], degree=3))
            add(Edge.make_bspline(
                [(5.6894281879, -23.6325524747), (6.0294169274, -23.0262918846), (6.3029405429, -21.2201590976), (6.3502553341, -15.1137353852), (6.6592869733, -12.2924128873), (5.6112064851, -10.5424236095), (3.928762237, -7.2454551493), (2.4641075989, -3.3296749739), (1.6345615732, -1.4169309288)],
                knots=[0, 0, 0, 0, 0.135285802, 0.3516949921, 0.4971104265, 0.6137421047, 0.7799950182, 1, 1, 1, 1], degree=3))
        make_face()
        with BuildLine():
            add(Edge.make_bspline(
                [(-11.4544853568, 20.8850093186), (-13.3831250096, 22.3815208443), (-16.8726422179, 25.0891840482), (-20.5810547116, 27.9211767393), (-22.2231186928, 32.4622663142), (-22.1061900395, 35.2963825837), (-22.0455490568, 36.6854647788)],
                knots=[0, 0, 0, 0, 0.294691905, 0.5330474492, 0.7706578355, 1, 1, 1, 1], degree=3))
            add(Edge.make_bspline(
                [(-22.0455490568, 36.6854647788), (-23.3263802505, 35.8176614299), (-24.5871705589, 34.8345517868), (-25.8107159623, 33.7731806512)],
                knots=[0.045228219, 0.045228219, 0.045228219, 0.045228219, 0.0541108044, 0.0541108044, 0.0541108044, 0.0541108044], degree=3))
            add(Edge.make_bspline(
                [(-25.8107159623, 33.7731806512), (-25.1153904588, 30.7271716499), (-24.4015362806, 27.6598029406), (-23.7062107772, 24.6137939394)],
                knots=[0, 0, 0, 0, 9.3980480426, 9.3980480426, 9.3980480426, 9.3980480426], degree=3))
            add(Edge.make_bspline(
                [(-23.7062107772, 24.6137939394), (-21.3903915949, 24.1204278596), (-16.9424193646, 23.1728242477), (-13.2327364884, 21.6263282704), (-11.4544853568, 20.8850093186)],
                knots=[0, 0, 0, 0, 0.5206460523, 1, 1, 1, 1], degree=3))
        make_face()
        with BuildLine():
            add(Edge.make_bspline(
                [(27.9653905239, 31.395479857), (26.9777623389, 32.3428383748), (25.9556430174, 33.1641522159), (24.5358739047, 34.1949462892)],
                knots=[0.9388348597, 0.9388348597, 0.9388348597, 0.9388348597, 0.9519222652, 0.9519222652, 0.9519222652, 0.9519222652], degree=3))
            add(Edge.make_bspline(
                [(24.5358739047, 34.1949462892), (23.4879896951, 33.0264970783), (20.5495068901, 30.4222182975), (16.2970825885, 28.0345928893), (13.6259915307, 26.4096427709)],
                knots=[0, 0, 0, 0, 0.442597588, 1, 1, 1, 1], degree=3))
            add(Edge.make_bspline(
                [(13.6259915307, 26.4096427709), (14.868920669, 26.2986663729), (17.2514108839, 26.1584062189), (24.774652777, 29.2598838581), (27.0484131927, 30.7945864143), (27.9653905239, 31.395479857)],
                knots=[0, 0, 0, 0, 0.2858529991, 0.7063590813, 1, 1, 1, 1], degree=3))
        make_face()
    extrude(amount=-F2_DEPTH)


with BuildPart() as f3:
    # F1 (on Front) → F3 (new body)
    with BuildSketch(Plane.XZ):
        with BuildLine():
            add(Edge.make_bspline(
                [(24.5358739047, 34.1949462892), (24.4433290355, 34.2621365821), (21.8294135785, 36.1505788176), (13.7200767318, 41.5241134747), (4.5021068795, 42.1889468096), (0, 42.2117872393)],
                knots=[0.9519222652, 0.9519222652, 0.9519222652, 0.9519222652, 0.9527753421, 0.9755852855, 1, 1, 1, 1], degree=3))
            add(Edge.make_bspline(
                [(0, 42.2117872393), (-4.1518296289, 42.2328506159), (-11.7950982354, 41.7428127116), (-18.5583280025, 38.9956928302), (-21.8416117864, 36.8236386827), (-22.0455490568, 36.6854647788)],
                knots=[0, 0, 0, 0, 0.0225151774, 0.0438139107, 0.045228219, 0.045228219, 0.045228219, 0.045228219], degree=3))
            add(Edge.make_bspline(
                [(-11.4544853568, 20.8850093186), (-13.3831250096, 22.3815208443), (-16.8726422179, 25.0891840482), (-20.5810547116, 27.9211767393), (-22.2231186928, 32.4622663142), (-22.1061900395, 35.2963825837), (-22.0455490568, 36.6854647788)],
                knots=[0, 0, 0, 0, 0.294691905, 0.5330474492, 0.7706578355, 1, 1, 1, 1], degree=3))
            add(Edge.make_bspline(
                [(-23.7062107772, 24.6137939394), (-21.3903915949, 24.1204278596), (-16.9424193646, 23.1728242477), (-13.2327364884, 21.6263282704), (-11.4544853568, 20.8850093186)],
                knots=[0, 0, 0, 0, 0.5206460523, 1, 1, 1, 1], degree=3))
            add(Edge.make_bspline(
                [(-25.8107159623, 33.7731806512), (-25.1153904588, 30.7271716499), (-24.4015362806, 27.6598029406), (-23.7062107772, 24.6137939394)],
                knots=[0, 0, 0, 0, 9.3980480426, 9.3980480426, 9.3980480426, 9.3980480426], degree=3))
            add(Edge.make_bspline(
                [(-25.8107159623, 33.7731806512), (-27.6085613015, 32.2136299029), (-32.3396448263, 27.4519948446), (-38.3374828793, 19.1153604845), (-40.6044889327, 7.5617746628), (-40.6895649134, 0.160899739), (-39.5035880323, -6.4994897033), (-33.3826669028, -10.9019134709), (-27.7631312299, -11.1810756086), (-22.678184549, -12.3446551948), (-19.2073445078, -12.8645914377), (-16.996587281, -17.3822862253), (-18.2265403297, -18.5991733267), (-18.3205187094, -24.5804643067), (-18.8558923982, -33.23684272), (-19.227253605, -39.2657426144), (-15.7491862761, -41.3032984762), (-13.6833573427, -41.1869410633), (-12.3461522337, -41.3189025592), (-12.259903056, -39.641815711), (-11.8422509257, -36.6374496799), (-12.1607198609, -33.5067173398), (-12.6847097019, -32.4134451461), (-11.0167872005, -28.3120606994), (-10.6319540152, -26.7097549158), (-9.2703902883, -27.4531554981), (-9.2454941531, -31.2745381629), (-7.1832623162, -36.42372276), (-6.8986091815, -39.104650667), (-6.7599340161, -39.930941303), (-5.1434315839, -39.5908424392), (-3.3777848263, -39.6631714956), (-2.3011178725, -39.7566957771), (-2.4275819303, -37.7459902706), (-2.3753767127, -35.3585257917), (-1.2109750063, -28.8526891406), (-1.7531941117, -27.5565836186), (-0.4279829764, -27.7785865503), (0.7443967174, -27.7854675929), (1.8262199292, -27.7259962358), (1.8186960843, -28.9119160062), (1.939885801, -36.3136478787), (1.7147514894, -37.153915214), (2.3153140554, -37.8653960955), (4.474137977, -35.7700630422), (7.9059440218, -33.949791946), (8.0597885263, -33.0338090974), (7.9964054591, -31.47586601), (7.5907060715, -28.3299618284), (8.0459994485, -28.1509086857), (10.0635743869, -27.9322750531), (10.5655419684, -28.4692820234), (10.6235516671, -29.4493784445), (12.046798778, -32.1975702095), (11.7372607804, -35.0029162994), (11.0287730808, -37.1627540966), (11.2943438203, -39.3279067847), (11.6822310138, -40.7688631927), (11.7641542089, -41.7336571667), (12.5927081487, -42.2437898456), (14.4897914582, -41.6547960008), (16.5386899479, -41.12852309), (17.497445307, -41.1386999382), (17.6748084447, -39.1404593024), (18.2501228287, -36.8914322934), (17.9208027823, -33.0181329788), (17.3852379788, -29.6683592104), (17.6574289505, -20.5026342529), (17.2814460979, -15.895420763), (19.3870938668, -12.641166496), (28.0889463204, -11.5115820335), (34.3484075669, -10.3351999916), (38.301085908, -7.8956922039), (40.1194286606, -3.4288857106), (40.8193777367, -0.4706351688), (41.1374570255, 6.3921409484), (37.8738587815, 18.2961121975), (32.0115398849, 26.9173704674), (29.2385585182, 30.1629197914), (28.0222448075, 31.3409437566), (27.9653905239, 31.395479857)],
                knots=[0.0541108044, 0.0541108044, 0.0541108044, 0.0541108044, 0.0671626411, 0.0900652708, 0.1122894062, 0.1301609437, 0.146680414, 0.1639138092, 0.1795682556, 0.194405388, 0.2065774387, 0.2200477559, 0.2278011522, 0.2432740409, 0.2633944941, 0.2788872676, 0.2909030042, 0.3003997174, 0.3070005619, 0.314507248, 0.3263972484, 0.3377885639, 0.3449893617, 0.3587443837, 0.3663284603, 0.3724509167, 0.3850088038, 0.4009612972, 0.4114994031, 0.4163389463, 0.4241766679, 0.4333217141, 0.439054527, 0.4471343161, 0.4581973396, 0.47507547, 0.4812862368, 0.4877545299, 0.4953651617, 0.5013243377, 0.5078482173, 0.5258276452, 0.5320393427, 0.5365745419, 0.5475076454, 0.5605446996, 0.5661163082, 0.5746275185, 0.5859814425, 0.5899877962, 0.5991364847, 0.6042707585, 0.6104528895, 0.6218419575, 0.6328992427, 0.6427529769, 0.6523553828, 0.6604165619, 0.666557621, 0.6722755539, 0.6815168022, 0.6912366323, 0.6968226628, 0.7053047419, 0.7156671247, 0.7281896012, 0.7406885031, 0.7605260422, 0.7746465306, 0.7862705734, 0.8054194498, 0.8223640938, 0.8360516094, 0.8499865894, 0.8613325091, 0.8780604221, 0.9013779912, 0.922684594, 0.9380814638, 0.9388348597, 0.9388348597, 0.9388348597, 0.9388348597], degree=3))
            add(Edge.make_bspline(
                [(13.6259915307, 26.4096427709), (14.868920669, 26.2986663729), (17.2514108839, 26.1584062189), (24.774652777, 29.2598838581), (27.0484131927, 30.7945864143), (27.9653905239, 31.395479857)],
                knots=[0, 0, 0, 0, 0.2858529991, 0.7063590813, 1, 1, 1, 1], degree=3))
            add(Edge.make_bspline(
                [(24.5358739047, 34.1949462892), (23.4879896951, 33.0264970783), (20.5495068901, 30.4222182975), (16.2970825885, 28.0345928893), (13.6259915307, 26.4096427709)],
                knots=[0, 0, 0, 0, 0.442597588, 1, 1, 1, 1], degree=3))
        make_face()
        with BuildLine():
            add(Edge.make_bspline(
                [(-2.1085075568, -1.3914147858), (-3.0655404836, -2.3386562763), (-5.5176771557, -4.7964180048), (-7.3450347709, -13.6700454772), (-6.8720338251, -20.1809438225), (-6.3022172592, -22.2871682189), (-6.0797305778, -23.1139957905)],
                knots=[0, 0, 0, 0, 0.2268235626, 0.5470060722, 0.8206682651, 1, 1, 1, 1], degree=3))
            add(Edge.make_bspline(
                [(1.6345615732, -1.4169309288), (1.490965324, -2.8579625684), (1.6698736726, -6.4929197922), (0.9107367519, -12.0917960968), (0.6636329535, -17.6207516228), (0.5351646096, -18.5518819855), (-0.5243314009, -18.4901924912), (-1.3020890252, -18.5600471583), (-1.0587853603, -17.0466885783), (-1.1918373245, -12.325085245), (-1.738616593, -7.0220474396), (-1.9139538894, -3.1950838865), (-2.1085075568, -1.3914147858)],
                knots=[0, 0, 0, 0, 0.1261947039, 0.26822284, 0.4000888499, 0.4464504861, 0.5016773906, 0.5452860405, 0.6054317293, 0.7298231859, 0.865007954, 1, 1, 1, 1], degree=3))
            add(Edge.make_bspline(
                [(5.6894281879, -23.6325524747), (6.0294169274, -23.0262918846), (6.3029405429, -21.2201590976), (6.3502553341, -15.1137353852), (6.6592869733, -12.2924128873), (5.6112064851, -10.5424236095), (3.928762237, -7.2454551493), (2.4641075989, -3.3296749739), (1.6345615732, -1.4169309288)],
                knots=[0, 0, 0, 0, 0.135285802, 0.3516949921, 0.4971104265, 0.6137421047, 0.7799950182, 1, 1, 1, 1], degree=3))
            add(Edge.make_bspline(
                [(-6.0797305778, -23.1139957905), (-5.2821336221, -22.6623060144), (-3.6182047793, -21.7144926982), (-0.5535468195, -21.5575389799), (2.8281198488, -22.13058005), (4.8519182444, -23.1744974538), (5.6894281879, -23.6325524747)],
                knots=[0, 0, 0, 0, 0.2364754365, 0.4826011482, 0.746859744, 1, 1, 1, 1], degree=3))
        make_face(mode=Mode.SUBTRACT)
        with BuildLine():
            add(Edge.make_bspline(
                [(-22.5164033473, 14.4161963835), (-20.3056495064, 14.5739696965), (-15.4484858005, 13.3950084417), (-9.5326219645, 7.0982389572), (-7.1356121774, 2.062845141), (-6.9678023394, -3.1505079616), (-11.089146518, -5.5142723572), (-21.5012962295, -5.2798109014), (-28.3301322656, -5.4011257214), (-33.4486923273, -2.8583619411), (-34.7708764838, 1.3541160099), (-33.3589073398, 7.4905291071), (-28.777927567, 12.6107787217), (-24.6418312895, 14.2645124639), (-22.5164033473, 14.4161963835)],
                knots=[0, 0, 0, 0, 0.0881708155, 0.1857505695, 0.2659278088, 0.3368364609, 0.4040378762, 0.5125763687, 0.6028363001, 0.6783990179, 0.7453411296, 0.8279473944, 0.9152322111, 1, 1, 1, 1], degree=3))
        make_face(mode=Mode.SUBTRACT)
        with BuildLine():
            add(Edge.make_bspline(
                [(23.0282414705, 14.1640426591), (20.6607105304, 14.283315886), (15.4573377902, 13.0131761992), (10.31799426, 7.3226457935), (7.8487509767, 2.4597974628), (7.2390637852, -2.6959434398), (10.0779558768, -6.0752341115), (21.2791142164, -5.323258849), (28.6496767132, -5.8063992171), (34.0231438718, -3.4327860627), (35.2164049867, 1.6282631307), (33.614011723, 7.1077034989), (29.2591111394, 12.5282611205), (25.2107117158, 14.054092557), (23.0282414705, 14.1640426591)],
                knots=[0, 0, 0, 0, 0.0911618856, 0.1827766253, 0.2616710357, 0.3345437506, 0.3973678532, 0.5076618027, 0.6020481042, 0.6776726552, 0.7495279, 0.8289506007, 0.9159638848, 1, 1, 1, 1], degree=3))
        make_face(mode=Mode.SUBTRACT)
    extrude(amount=F3_DEPTH)


with BuildPart() as f2_1:
    # F4: moved
    add(f2.part)


solid = Compound([f3.part, f2_1.part])
